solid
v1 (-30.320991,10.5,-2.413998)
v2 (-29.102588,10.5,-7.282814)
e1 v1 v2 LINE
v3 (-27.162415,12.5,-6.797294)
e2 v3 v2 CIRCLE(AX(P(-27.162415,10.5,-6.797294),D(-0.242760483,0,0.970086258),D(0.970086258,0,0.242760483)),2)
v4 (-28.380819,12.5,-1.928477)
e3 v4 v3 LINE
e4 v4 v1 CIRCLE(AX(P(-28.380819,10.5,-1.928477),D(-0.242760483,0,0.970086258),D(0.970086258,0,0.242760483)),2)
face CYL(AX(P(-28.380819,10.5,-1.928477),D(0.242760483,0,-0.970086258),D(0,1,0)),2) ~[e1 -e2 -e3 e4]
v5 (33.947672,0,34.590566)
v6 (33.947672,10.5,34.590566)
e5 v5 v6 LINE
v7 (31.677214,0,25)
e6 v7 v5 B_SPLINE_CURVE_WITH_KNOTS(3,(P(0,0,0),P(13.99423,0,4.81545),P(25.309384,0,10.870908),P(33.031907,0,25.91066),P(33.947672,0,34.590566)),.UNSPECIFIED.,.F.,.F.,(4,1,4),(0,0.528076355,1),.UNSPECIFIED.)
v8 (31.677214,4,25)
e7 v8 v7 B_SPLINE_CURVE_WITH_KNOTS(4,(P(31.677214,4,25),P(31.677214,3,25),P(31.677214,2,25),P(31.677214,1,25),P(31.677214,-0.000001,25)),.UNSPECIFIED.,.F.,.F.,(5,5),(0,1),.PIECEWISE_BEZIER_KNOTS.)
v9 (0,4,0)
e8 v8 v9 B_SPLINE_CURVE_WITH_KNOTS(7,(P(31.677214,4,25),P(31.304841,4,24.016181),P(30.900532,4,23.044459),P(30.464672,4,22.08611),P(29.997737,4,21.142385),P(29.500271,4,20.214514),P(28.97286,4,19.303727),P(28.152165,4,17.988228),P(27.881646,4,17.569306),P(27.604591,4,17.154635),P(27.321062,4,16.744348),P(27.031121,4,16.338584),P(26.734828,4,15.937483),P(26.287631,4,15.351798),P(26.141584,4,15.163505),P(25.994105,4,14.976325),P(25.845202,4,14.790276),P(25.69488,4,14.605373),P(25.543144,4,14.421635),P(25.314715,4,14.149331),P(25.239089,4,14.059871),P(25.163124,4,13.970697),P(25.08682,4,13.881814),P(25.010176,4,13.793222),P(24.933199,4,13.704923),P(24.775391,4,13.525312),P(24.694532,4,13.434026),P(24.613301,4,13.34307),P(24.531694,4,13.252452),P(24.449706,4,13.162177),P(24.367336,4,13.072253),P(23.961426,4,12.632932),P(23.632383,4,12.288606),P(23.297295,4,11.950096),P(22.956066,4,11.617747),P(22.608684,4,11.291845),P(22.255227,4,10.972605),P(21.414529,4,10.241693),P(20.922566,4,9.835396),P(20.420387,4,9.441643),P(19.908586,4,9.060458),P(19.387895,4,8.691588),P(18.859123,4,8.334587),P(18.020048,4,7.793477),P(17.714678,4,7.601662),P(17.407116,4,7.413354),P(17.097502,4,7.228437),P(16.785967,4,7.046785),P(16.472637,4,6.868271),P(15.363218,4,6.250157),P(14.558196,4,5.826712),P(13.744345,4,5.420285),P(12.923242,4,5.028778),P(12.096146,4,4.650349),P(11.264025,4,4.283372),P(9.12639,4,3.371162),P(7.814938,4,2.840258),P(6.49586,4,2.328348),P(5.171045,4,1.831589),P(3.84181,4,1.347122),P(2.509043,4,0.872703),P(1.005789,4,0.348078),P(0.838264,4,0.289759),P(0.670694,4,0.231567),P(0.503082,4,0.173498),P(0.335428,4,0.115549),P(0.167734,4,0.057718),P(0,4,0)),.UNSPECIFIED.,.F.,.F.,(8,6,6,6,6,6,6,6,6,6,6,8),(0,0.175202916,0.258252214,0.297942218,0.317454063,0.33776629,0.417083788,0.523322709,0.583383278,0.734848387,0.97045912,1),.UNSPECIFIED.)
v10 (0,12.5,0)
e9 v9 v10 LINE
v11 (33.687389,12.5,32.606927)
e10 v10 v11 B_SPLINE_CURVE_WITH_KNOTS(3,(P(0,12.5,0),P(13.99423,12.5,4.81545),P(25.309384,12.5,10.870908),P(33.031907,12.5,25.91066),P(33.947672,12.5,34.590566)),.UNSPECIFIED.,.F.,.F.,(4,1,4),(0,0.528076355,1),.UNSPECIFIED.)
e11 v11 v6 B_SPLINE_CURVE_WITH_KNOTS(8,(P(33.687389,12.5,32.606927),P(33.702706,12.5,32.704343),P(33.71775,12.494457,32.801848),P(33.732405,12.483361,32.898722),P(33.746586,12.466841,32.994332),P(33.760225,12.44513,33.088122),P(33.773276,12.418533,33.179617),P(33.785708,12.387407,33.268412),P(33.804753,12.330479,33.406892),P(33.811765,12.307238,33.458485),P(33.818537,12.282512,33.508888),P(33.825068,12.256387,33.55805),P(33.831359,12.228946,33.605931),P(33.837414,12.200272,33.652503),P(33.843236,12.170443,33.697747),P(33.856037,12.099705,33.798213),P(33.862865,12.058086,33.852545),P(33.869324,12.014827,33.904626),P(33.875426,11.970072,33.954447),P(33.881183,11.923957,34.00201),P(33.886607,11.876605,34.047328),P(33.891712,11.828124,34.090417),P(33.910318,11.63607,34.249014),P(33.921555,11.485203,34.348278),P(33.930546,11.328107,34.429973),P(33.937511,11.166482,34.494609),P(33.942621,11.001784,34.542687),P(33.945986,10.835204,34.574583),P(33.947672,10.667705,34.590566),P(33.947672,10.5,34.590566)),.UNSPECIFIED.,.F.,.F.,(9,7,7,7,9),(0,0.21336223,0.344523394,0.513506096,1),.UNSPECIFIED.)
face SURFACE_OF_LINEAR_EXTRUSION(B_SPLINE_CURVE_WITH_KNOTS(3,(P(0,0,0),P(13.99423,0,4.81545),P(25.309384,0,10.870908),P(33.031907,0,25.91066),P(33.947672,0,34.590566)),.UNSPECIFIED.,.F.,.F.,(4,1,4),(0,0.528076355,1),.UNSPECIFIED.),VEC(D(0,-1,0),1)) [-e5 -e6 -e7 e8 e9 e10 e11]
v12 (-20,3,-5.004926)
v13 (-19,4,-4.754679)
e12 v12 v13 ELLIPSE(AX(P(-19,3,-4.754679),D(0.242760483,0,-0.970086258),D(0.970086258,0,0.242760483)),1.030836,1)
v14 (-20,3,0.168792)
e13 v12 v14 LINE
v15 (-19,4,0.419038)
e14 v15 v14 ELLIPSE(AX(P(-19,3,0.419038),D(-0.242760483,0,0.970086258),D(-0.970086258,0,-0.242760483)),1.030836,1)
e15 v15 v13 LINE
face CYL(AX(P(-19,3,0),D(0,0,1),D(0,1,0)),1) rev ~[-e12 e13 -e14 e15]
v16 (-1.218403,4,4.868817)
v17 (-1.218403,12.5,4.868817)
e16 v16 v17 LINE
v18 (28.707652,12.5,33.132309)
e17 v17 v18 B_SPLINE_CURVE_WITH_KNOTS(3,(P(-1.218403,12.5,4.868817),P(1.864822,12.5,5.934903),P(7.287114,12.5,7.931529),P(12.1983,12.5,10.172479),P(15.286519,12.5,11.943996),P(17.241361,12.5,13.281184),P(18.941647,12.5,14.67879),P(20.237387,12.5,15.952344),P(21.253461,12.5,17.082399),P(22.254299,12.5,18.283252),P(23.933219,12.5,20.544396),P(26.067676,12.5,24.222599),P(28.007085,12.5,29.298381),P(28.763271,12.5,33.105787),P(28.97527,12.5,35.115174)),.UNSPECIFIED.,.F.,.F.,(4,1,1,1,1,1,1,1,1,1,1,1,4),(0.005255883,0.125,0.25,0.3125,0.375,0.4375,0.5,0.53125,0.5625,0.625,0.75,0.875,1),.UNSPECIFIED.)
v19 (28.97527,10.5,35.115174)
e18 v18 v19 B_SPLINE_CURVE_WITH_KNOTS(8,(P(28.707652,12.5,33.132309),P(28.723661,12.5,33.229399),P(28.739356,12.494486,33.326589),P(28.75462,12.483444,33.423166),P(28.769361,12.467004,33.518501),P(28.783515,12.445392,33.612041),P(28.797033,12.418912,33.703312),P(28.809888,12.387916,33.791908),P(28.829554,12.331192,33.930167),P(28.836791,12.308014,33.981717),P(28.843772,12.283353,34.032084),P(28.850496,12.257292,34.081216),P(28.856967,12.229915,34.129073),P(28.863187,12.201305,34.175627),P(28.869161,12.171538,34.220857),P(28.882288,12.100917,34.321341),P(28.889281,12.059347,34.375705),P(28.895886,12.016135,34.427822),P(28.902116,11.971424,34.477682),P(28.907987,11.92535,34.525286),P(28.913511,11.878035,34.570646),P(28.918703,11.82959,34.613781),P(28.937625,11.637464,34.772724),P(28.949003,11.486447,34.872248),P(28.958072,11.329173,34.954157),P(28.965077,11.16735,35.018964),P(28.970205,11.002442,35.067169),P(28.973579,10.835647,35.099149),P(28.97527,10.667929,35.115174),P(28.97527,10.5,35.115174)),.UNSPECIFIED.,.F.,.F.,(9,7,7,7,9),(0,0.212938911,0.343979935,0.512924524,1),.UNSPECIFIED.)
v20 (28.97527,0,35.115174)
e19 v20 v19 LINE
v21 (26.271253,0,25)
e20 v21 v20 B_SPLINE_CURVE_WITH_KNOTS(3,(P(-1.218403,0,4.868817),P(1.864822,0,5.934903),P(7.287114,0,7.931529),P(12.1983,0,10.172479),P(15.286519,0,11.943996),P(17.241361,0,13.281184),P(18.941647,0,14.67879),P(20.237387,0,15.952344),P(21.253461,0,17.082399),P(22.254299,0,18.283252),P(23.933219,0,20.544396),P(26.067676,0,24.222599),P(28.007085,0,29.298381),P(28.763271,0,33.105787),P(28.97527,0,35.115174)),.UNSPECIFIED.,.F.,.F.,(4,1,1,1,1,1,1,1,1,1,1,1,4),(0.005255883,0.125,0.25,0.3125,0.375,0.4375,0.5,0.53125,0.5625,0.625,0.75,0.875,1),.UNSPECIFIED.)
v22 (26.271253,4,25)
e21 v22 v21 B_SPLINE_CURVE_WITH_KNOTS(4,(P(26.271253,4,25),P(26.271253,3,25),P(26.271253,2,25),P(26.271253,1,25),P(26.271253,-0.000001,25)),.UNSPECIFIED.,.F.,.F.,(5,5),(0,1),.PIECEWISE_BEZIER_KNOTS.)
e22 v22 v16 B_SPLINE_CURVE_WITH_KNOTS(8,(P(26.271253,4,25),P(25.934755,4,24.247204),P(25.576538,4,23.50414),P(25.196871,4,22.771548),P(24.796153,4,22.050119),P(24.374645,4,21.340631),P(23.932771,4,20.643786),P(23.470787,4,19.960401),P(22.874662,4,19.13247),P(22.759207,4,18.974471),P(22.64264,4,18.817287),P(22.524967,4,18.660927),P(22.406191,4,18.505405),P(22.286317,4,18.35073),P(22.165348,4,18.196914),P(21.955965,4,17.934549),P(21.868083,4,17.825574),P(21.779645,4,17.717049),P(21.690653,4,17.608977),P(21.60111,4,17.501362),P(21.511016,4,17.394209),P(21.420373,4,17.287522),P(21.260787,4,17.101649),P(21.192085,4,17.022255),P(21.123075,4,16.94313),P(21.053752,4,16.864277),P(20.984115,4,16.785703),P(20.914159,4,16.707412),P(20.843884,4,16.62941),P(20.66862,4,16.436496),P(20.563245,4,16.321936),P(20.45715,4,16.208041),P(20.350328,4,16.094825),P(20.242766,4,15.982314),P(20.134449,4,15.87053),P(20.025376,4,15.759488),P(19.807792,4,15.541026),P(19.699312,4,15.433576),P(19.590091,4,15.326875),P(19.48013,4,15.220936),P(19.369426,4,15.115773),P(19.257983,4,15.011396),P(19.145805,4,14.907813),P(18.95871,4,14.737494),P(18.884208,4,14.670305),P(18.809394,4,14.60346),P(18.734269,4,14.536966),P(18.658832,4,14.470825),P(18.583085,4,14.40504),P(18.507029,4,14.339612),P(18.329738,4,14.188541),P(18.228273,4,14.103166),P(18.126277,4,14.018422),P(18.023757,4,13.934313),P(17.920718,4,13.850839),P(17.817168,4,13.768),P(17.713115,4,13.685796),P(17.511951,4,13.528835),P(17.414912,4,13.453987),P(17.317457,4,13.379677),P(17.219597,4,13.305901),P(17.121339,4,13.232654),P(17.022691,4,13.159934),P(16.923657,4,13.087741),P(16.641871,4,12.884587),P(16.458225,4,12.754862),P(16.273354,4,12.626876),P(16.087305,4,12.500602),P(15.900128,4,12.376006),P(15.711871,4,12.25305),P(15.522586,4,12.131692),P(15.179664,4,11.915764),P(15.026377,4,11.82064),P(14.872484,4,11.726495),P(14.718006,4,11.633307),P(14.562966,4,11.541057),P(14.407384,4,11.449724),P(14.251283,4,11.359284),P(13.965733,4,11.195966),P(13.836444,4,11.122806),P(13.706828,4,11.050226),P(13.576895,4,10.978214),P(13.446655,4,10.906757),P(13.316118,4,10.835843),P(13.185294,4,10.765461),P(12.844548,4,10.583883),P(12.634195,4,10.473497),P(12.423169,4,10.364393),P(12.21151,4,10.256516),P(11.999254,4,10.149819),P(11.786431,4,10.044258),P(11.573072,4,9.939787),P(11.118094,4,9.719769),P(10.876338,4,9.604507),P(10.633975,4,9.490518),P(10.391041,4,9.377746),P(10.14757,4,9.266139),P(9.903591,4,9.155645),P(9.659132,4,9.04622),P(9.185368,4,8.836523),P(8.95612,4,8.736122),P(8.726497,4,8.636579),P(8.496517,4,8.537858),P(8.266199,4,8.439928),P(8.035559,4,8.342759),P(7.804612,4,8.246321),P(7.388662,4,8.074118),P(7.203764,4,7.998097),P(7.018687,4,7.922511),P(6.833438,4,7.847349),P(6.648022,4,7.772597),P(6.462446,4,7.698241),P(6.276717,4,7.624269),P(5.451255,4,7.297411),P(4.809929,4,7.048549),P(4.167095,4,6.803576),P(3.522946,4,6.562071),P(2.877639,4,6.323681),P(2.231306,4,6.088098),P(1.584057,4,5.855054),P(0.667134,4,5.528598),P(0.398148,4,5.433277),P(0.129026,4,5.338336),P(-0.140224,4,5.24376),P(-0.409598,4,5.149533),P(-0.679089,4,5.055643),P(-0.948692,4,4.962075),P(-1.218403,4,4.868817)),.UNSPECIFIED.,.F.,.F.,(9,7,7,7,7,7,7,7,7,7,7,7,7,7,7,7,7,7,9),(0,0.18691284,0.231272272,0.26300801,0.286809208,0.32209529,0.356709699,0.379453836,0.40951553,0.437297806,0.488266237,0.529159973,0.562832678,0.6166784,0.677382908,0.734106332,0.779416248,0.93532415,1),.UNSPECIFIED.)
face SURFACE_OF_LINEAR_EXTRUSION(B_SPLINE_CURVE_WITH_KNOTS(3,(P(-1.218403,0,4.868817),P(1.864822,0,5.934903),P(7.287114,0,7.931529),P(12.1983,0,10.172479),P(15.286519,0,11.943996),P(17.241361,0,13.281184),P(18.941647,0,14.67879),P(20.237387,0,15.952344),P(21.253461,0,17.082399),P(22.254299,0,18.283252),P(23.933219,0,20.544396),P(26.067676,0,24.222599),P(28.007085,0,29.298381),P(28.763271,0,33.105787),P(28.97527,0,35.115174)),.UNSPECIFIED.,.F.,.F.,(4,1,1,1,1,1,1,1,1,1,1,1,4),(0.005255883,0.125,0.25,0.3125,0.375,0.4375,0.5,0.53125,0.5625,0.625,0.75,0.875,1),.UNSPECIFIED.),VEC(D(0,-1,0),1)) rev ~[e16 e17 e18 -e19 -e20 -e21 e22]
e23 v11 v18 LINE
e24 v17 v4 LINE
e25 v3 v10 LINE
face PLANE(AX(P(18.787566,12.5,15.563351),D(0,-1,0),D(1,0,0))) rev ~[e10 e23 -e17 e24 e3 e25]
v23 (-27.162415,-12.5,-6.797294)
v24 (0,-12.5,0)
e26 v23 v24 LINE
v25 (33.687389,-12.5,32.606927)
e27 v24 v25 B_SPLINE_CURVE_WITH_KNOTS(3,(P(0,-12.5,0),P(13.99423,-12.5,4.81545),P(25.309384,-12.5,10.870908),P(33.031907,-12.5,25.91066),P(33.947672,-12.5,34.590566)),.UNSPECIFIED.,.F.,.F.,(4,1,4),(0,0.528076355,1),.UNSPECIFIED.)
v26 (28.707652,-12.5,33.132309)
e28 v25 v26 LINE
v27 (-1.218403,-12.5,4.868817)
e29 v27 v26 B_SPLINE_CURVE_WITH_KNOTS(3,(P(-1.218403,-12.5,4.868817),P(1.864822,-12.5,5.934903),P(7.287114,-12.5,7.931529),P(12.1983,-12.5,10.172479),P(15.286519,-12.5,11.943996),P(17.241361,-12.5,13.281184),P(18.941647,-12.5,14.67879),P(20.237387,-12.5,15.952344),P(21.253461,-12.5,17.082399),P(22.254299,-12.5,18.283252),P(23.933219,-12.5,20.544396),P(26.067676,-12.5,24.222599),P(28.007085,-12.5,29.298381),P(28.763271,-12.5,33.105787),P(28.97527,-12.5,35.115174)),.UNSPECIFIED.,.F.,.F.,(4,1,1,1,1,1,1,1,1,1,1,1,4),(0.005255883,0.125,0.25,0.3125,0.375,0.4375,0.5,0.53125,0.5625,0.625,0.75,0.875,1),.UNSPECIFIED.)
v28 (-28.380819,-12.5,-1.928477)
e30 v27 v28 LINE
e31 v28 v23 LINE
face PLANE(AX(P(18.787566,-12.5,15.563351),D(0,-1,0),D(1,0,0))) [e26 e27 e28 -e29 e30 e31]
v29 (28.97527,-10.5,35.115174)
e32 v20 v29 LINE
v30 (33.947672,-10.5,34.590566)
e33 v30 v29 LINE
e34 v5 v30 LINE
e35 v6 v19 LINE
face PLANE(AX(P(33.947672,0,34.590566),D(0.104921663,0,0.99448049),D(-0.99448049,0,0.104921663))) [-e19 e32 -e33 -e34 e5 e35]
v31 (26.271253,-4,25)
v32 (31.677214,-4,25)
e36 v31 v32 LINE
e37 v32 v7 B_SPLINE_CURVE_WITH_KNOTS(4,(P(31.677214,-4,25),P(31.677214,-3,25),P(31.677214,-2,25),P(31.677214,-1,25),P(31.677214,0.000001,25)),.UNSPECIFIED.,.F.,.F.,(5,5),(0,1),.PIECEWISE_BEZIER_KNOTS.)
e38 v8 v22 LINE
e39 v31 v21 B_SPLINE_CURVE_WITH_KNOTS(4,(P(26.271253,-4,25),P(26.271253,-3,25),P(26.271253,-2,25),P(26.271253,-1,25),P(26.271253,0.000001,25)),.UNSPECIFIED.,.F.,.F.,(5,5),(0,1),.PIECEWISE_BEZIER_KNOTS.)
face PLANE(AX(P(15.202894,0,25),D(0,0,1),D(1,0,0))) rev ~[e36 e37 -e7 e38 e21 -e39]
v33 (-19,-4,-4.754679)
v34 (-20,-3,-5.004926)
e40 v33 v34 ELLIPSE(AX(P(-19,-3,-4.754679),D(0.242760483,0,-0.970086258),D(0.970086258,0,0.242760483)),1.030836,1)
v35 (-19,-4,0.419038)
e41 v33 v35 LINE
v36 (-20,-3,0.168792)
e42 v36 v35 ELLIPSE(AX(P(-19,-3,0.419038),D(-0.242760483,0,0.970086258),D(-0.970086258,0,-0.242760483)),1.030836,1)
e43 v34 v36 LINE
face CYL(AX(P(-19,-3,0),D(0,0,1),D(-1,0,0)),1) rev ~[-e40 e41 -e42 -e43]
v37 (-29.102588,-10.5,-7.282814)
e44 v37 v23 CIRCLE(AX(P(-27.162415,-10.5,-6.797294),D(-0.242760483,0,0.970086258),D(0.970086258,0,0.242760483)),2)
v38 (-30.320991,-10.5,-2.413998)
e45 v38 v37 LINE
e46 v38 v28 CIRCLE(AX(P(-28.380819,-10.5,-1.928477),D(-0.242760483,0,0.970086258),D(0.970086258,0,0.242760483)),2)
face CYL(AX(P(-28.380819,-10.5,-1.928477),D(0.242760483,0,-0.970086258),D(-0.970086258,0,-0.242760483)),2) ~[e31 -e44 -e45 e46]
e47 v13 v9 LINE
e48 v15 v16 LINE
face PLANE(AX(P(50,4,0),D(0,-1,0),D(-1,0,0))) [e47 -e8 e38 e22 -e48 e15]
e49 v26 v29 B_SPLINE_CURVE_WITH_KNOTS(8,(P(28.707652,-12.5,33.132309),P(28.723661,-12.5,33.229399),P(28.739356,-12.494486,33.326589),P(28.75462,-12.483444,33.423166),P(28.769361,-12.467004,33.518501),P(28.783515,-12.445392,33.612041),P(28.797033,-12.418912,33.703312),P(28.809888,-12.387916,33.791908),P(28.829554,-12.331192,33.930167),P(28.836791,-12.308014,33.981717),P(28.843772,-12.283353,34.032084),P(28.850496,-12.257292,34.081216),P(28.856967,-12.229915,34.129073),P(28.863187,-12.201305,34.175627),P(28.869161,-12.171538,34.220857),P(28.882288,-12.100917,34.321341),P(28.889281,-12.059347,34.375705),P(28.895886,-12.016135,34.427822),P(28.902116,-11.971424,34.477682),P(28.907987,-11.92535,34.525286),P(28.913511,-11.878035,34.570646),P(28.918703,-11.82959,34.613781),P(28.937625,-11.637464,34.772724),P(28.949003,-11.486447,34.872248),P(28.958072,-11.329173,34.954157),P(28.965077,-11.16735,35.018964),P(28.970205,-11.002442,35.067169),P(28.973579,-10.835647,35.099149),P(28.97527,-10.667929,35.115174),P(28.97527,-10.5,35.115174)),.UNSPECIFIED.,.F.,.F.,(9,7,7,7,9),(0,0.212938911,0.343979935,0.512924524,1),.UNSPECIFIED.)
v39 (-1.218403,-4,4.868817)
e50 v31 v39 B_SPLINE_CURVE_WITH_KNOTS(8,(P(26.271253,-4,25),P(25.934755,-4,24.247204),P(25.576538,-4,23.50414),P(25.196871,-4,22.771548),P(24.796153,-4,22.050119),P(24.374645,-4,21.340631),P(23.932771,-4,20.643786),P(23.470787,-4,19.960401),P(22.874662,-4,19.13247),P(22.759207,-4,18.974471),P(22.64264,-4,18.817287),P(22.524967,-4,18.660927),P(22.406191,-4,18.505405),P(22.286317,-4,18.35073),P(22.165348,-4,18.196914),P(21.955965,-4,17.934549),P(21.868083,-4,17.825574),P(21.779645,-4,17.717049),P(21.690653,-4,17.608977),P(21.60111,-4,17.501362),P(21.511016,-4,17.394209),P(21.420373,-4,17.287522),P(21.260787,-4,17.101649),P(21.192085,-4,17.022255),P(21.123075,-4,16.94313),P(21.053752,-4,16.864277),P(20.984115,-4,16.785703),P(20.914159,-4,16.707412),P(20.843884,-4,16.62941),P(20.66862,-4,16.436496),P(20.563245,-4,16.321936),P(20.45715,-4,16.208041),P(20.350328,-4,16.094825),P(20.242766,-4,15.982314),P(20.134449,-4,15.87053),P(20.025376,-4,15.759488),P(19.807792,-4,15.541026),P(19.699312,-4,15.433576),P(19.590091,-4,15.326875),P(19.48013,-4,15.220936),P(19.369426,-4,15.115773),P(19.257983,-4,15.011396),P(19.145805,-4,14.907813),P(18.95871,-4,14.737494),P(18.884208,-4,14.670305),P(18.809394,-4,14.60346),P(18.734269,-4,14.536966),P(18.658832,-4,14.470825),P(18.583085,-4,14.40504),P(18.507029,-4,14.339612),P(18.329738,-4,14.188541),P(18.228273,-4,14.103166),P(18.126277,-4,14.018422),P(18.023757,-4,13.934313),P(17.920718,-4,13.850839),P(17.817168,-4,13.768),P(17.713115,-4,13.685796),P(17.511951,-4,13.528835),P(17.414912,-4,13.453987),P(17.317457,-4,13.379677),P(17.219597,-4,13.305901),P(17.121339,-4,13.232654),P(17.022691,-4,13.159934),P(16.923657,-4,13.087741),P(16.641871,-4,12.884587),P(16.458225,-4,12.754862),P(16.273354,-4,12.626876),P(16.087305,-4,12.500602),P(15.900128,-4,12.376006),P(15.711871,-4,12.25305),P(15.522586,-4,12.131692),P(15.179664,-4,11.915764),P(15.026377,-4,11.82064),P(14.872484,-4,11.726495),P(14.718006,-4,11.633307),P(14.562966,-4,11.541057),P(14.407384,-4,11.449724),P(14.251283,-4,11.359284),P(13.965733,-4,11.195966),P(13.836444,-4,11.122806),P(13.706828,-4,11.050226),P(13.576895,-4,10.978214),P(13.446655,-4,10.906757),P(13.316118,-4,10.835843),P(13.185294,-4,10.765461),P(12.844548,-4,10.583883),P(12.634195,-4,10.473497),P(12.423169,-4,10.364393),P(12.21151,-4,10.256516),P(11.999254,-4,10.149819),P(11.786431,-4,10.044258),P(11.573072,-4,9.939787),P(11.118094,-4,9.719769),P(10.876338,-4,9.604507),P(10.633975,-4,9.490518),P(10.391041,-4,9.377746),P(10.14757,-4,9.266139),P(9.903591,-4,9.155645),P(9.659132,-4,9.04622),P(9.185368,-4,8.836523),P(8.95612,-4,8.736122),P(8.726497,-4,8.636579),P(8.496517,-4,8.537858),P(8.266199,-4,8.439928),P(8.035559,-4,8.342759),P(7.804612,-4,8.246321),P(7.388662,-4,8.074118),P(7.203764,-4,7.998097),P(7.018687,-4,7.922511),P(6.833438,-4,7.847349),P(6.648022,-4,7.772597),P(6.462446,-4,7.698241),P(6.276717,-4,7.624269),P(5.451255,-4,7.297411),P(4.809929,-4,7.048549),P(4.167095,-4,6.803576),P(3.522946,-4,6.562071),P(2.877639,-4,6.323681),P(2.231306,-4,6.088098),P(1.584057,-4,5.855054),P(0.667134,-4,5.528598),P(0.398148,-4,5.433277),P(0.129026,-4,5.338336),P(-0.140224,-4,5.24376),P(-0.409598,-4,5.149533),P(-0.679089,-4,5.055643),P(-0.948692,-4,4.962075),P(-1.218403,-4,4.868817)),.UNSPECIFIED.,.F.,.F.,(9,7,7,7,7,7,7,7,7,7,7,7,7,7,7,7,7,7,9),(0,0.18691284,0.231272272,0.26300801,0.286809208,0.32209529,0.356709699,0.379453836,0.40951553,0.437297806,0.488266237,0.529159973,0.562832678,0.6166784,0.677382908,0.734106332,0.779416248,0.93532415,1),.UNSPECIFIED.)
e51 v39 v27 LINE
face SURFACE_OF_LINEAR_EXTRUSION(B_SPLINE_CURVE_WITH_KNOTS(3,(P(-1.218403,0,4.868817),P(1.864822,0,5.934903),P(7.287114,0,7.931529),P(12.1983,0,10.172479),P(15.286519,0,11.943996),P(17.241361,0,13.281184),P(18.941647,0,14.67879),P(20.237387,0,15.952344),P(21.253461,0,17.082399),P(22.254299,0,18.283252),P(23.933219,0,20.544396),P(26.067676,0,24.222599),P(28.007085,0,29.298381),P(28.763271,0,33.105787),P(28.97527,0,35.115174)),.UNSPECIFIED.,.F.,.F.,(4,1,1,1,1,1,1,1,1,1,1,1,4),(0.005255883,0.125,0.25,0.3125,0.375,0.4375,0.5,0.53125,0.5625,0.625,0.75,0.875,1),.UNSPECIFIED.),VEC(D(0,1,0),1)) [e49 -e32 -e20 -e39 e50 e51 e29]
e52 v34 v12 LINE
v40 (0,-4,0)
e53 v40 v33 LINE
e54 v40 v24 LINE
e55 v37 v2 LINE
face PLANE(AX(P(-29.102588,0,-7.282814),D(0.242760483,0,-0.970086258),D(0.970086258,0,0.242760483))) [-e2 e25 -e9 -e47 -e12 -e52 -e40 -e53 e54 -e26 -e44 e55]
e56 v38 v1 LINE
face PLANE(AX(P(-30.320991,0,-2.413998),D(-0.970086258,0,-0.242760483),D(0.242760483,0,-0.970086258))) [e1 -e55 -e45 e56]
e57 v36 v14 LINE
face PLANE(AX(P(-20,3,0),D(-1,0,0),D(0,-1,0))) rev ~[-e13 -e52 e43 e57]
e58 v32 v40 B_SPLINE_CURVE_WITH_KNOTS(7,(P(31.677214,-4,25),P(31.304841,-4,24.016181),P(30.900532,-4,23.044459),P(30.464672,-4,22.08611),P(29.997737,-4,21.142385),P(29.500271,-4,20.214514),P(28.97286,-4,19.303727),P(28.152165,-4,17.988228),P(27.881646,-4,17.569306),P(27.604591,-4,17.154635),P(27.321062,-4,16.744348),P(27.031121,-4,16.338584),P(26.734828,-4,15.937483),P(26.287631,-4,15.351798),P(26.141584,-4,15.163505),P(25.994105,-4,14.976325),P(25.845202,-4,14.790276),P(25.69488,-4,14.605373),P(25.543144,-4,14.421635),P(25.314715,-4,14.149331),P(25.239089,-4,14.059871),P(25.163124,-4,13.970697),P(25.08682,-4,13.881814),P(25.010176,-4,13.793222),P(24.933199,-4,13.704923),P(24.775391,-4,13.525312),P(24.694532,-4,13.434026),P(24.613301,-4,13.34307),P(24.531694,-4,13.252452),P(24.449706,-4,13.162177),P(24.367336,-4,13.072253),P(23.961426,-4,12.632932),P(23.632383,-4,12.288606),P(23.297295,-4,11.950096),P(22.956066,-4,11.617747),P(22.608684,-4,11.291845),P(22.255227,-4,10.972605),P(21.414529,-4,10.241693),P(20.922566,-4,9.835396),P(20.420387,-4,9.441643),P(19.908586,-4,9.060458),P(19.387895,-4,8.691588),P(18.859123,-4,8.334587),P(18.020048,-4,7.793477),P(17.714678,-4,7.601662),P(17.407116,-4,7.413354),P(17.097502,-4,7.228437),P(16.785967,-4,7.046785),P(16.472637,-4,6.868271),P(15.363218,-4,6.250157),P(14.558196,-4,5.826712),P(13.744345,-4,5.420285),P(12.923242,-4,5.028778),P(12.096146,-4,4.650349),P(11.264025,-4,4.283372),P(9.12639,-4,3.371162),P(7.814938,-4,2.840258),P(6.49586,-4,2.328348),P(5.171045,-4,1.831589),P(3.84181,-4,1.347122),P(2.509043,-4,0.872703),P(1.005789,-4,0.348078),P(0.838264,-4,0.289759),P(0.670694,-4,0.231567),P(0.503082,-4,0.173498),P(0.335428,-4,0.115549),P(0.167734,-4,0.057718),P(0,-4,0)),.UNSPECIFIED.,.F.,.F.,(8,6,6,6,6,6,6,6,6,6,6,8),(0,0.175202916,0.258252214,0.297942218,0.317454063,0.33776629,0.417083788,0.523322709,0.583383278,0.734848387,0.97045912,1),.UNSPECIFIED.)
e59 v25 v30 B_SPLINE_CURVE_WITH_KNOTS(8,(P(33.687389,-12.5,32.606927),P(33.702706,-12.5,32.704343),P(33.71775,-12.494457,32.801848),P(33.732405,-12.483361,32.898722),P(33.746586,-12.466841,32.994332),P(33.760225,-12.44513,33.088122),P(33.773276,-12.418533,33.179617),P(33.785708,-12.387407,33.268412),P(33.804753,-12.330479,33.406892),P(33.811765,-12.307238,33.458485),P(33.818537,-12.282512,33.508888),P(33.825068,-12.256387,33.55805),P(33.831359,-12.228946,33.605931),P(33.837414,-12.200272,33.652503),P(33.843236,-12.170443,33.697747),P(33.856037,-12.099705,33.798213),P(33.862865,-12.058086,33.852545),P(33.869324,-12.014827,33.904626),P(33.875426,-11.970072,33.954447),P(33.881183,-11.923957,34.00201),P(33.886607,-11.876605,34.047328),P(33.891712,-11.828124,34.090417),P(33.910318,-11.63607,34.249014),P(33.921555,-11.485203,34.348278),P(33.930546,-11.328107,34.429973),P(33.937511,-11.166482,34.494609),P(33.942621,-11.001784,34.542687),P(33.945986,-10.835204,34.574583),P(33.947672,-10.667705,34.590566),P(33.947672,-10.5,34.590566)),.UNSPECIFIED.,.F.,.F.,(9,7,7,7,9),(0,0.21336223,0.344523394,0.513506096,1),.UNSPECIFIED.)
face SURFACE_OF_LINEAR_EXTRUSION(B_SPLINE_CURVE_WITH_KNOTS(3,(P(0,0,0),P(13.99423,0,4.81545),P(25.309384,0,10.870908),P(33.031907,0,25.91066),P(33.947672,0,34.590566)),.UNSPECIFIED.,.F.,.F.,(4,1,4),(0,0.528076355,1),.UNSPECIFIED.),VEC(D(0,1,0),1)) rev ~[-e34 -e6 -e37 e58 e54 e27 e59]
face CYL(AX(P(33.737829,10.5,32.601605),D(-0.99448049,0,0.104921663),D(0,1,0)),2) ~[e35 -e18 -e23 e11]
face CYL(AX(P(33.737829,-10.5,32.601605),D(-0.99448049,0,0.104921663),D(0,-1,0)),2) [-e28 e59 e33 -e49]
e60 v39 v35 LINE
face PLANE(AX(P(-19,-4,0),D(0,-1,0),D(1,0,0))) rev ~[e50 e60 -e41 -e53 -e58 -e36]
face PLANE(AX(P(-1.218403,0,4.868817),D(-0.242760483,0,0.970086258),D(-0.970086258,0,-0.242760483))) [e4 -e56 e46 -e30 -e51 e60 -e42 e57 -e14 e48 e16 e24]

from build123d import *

# Parameters (mm, degrees)
F1_DEPTH      = 12.5
F1_DEPTH_BACK = 12.5
F2_R          = 2
F4_DEPTH      = 25
F4_DEPTH_BACK = 25


# Not quite as in the source:
# - ends of sketch curves that miss each other by under 0.0002 mm in the source are joined
# - the dataset's text gives a spline's control points without its knots; the knots are read off the source's solid


with BuildPart() as f1:
    # F0 (on Front) → F1 (new body, two sides)
    with BuildSketch(Plane.XZ) as f1_sk:
        with BuildLine():
            Line((-1.2184032821, 4.8688166534), (0, 0))
            add(Edge.make_bspline(
                [(0, 0), (13.9942302595, 4.8154504329), (25.3093838267, 10.870907846), (33.031907279, 25.9106602745), (33.9476719961, 34.5905660178)],
                knots=[0, 0, 0, 0, 0.5280763551, 1, 1, 1, 1], degree=3))
            Line((33.9476719961, 34.5905660178), (28.975269547, 35.1151743323))
            add(Edge.make_bspline(
                [(-1.2184032821, 4.8688166534), (1.8648217541, 5.9349029149), (7.287113618, 7.9315285829), (12.1983004489, 10.1724794599), (15.2865186932, 11.9439955294), (17.2413608312, 13.281183998), (18.9416466936, 14.6787902185), (20.2373870468, 15.9523435041), (21.2534611324, 17.0823993837), (22.2542990458, 18.283251609), (23.9332185037, 20.5443961427), (26.0676758341, 24.2225990158), (28.0070847052, 29.2983814533), (28.7632711893, 33.1057872835), (28.975269547, 35.1151743323)],
                knots=[0.0052558834, 0.0052558834, 0.0052558834, 0.0052558834, 0.125, 0.25, 0.3125, 0.375, 0.4375, 0.5, 0.53125, 0.5625, 0.625, 0.75, 0.875, 1, 1, 1, 1], degree=3))
        make_face()
        Polygon((-29.1025877416, -7.2828144797), (0, 0), (-1.2184032821, 4.8688166534), (-30.3209910237, -2.4139978263), align=None)
    extrude(amount=F1_DEPTH)
    extrude(f1_sk.sketch, amount=-F1_DEPTH_BACK)

    # F2
    f2_edges = [f1.edges().sort_by_distance(p)[0] for p in [
        (31.461471, -12.5, 34.85287),
        (31.461471, 12.5, 34.85287),
        (-29.711789, -12.5, -4.848406),
        (-29.711789, 12.5, -4.848406),
    ]]
    fillet(f2_edges, radius=F2_R)

    # F3 (on Top) → F4 (cut, two sides)
    with BuildSketch(Plane.XY) as f4_sk:
        with BuildLine():
            Line((-19, -4), (50, -4))
            Line((50, -4), (50, 4))
            Line((50, 4), (-19, 4))
            ThreePointArc((-19, 4), (-19.7071067812, 3.7071067812), (-20, 3))
            Line((-20, 3), (-20, -3))
            ThreePointArc((-20, -3), (-19.7071067812, -3.7071067812), (-19, -4))
        make_face()
    extrude(amount=F4_DEPTH, mode=Mode.SUBTRACT)
    extrude(f4_sk.sketch, amount=-F4_DEPTH_BACK, mode=Mode.SUBTRACT)


solid = f1.part
